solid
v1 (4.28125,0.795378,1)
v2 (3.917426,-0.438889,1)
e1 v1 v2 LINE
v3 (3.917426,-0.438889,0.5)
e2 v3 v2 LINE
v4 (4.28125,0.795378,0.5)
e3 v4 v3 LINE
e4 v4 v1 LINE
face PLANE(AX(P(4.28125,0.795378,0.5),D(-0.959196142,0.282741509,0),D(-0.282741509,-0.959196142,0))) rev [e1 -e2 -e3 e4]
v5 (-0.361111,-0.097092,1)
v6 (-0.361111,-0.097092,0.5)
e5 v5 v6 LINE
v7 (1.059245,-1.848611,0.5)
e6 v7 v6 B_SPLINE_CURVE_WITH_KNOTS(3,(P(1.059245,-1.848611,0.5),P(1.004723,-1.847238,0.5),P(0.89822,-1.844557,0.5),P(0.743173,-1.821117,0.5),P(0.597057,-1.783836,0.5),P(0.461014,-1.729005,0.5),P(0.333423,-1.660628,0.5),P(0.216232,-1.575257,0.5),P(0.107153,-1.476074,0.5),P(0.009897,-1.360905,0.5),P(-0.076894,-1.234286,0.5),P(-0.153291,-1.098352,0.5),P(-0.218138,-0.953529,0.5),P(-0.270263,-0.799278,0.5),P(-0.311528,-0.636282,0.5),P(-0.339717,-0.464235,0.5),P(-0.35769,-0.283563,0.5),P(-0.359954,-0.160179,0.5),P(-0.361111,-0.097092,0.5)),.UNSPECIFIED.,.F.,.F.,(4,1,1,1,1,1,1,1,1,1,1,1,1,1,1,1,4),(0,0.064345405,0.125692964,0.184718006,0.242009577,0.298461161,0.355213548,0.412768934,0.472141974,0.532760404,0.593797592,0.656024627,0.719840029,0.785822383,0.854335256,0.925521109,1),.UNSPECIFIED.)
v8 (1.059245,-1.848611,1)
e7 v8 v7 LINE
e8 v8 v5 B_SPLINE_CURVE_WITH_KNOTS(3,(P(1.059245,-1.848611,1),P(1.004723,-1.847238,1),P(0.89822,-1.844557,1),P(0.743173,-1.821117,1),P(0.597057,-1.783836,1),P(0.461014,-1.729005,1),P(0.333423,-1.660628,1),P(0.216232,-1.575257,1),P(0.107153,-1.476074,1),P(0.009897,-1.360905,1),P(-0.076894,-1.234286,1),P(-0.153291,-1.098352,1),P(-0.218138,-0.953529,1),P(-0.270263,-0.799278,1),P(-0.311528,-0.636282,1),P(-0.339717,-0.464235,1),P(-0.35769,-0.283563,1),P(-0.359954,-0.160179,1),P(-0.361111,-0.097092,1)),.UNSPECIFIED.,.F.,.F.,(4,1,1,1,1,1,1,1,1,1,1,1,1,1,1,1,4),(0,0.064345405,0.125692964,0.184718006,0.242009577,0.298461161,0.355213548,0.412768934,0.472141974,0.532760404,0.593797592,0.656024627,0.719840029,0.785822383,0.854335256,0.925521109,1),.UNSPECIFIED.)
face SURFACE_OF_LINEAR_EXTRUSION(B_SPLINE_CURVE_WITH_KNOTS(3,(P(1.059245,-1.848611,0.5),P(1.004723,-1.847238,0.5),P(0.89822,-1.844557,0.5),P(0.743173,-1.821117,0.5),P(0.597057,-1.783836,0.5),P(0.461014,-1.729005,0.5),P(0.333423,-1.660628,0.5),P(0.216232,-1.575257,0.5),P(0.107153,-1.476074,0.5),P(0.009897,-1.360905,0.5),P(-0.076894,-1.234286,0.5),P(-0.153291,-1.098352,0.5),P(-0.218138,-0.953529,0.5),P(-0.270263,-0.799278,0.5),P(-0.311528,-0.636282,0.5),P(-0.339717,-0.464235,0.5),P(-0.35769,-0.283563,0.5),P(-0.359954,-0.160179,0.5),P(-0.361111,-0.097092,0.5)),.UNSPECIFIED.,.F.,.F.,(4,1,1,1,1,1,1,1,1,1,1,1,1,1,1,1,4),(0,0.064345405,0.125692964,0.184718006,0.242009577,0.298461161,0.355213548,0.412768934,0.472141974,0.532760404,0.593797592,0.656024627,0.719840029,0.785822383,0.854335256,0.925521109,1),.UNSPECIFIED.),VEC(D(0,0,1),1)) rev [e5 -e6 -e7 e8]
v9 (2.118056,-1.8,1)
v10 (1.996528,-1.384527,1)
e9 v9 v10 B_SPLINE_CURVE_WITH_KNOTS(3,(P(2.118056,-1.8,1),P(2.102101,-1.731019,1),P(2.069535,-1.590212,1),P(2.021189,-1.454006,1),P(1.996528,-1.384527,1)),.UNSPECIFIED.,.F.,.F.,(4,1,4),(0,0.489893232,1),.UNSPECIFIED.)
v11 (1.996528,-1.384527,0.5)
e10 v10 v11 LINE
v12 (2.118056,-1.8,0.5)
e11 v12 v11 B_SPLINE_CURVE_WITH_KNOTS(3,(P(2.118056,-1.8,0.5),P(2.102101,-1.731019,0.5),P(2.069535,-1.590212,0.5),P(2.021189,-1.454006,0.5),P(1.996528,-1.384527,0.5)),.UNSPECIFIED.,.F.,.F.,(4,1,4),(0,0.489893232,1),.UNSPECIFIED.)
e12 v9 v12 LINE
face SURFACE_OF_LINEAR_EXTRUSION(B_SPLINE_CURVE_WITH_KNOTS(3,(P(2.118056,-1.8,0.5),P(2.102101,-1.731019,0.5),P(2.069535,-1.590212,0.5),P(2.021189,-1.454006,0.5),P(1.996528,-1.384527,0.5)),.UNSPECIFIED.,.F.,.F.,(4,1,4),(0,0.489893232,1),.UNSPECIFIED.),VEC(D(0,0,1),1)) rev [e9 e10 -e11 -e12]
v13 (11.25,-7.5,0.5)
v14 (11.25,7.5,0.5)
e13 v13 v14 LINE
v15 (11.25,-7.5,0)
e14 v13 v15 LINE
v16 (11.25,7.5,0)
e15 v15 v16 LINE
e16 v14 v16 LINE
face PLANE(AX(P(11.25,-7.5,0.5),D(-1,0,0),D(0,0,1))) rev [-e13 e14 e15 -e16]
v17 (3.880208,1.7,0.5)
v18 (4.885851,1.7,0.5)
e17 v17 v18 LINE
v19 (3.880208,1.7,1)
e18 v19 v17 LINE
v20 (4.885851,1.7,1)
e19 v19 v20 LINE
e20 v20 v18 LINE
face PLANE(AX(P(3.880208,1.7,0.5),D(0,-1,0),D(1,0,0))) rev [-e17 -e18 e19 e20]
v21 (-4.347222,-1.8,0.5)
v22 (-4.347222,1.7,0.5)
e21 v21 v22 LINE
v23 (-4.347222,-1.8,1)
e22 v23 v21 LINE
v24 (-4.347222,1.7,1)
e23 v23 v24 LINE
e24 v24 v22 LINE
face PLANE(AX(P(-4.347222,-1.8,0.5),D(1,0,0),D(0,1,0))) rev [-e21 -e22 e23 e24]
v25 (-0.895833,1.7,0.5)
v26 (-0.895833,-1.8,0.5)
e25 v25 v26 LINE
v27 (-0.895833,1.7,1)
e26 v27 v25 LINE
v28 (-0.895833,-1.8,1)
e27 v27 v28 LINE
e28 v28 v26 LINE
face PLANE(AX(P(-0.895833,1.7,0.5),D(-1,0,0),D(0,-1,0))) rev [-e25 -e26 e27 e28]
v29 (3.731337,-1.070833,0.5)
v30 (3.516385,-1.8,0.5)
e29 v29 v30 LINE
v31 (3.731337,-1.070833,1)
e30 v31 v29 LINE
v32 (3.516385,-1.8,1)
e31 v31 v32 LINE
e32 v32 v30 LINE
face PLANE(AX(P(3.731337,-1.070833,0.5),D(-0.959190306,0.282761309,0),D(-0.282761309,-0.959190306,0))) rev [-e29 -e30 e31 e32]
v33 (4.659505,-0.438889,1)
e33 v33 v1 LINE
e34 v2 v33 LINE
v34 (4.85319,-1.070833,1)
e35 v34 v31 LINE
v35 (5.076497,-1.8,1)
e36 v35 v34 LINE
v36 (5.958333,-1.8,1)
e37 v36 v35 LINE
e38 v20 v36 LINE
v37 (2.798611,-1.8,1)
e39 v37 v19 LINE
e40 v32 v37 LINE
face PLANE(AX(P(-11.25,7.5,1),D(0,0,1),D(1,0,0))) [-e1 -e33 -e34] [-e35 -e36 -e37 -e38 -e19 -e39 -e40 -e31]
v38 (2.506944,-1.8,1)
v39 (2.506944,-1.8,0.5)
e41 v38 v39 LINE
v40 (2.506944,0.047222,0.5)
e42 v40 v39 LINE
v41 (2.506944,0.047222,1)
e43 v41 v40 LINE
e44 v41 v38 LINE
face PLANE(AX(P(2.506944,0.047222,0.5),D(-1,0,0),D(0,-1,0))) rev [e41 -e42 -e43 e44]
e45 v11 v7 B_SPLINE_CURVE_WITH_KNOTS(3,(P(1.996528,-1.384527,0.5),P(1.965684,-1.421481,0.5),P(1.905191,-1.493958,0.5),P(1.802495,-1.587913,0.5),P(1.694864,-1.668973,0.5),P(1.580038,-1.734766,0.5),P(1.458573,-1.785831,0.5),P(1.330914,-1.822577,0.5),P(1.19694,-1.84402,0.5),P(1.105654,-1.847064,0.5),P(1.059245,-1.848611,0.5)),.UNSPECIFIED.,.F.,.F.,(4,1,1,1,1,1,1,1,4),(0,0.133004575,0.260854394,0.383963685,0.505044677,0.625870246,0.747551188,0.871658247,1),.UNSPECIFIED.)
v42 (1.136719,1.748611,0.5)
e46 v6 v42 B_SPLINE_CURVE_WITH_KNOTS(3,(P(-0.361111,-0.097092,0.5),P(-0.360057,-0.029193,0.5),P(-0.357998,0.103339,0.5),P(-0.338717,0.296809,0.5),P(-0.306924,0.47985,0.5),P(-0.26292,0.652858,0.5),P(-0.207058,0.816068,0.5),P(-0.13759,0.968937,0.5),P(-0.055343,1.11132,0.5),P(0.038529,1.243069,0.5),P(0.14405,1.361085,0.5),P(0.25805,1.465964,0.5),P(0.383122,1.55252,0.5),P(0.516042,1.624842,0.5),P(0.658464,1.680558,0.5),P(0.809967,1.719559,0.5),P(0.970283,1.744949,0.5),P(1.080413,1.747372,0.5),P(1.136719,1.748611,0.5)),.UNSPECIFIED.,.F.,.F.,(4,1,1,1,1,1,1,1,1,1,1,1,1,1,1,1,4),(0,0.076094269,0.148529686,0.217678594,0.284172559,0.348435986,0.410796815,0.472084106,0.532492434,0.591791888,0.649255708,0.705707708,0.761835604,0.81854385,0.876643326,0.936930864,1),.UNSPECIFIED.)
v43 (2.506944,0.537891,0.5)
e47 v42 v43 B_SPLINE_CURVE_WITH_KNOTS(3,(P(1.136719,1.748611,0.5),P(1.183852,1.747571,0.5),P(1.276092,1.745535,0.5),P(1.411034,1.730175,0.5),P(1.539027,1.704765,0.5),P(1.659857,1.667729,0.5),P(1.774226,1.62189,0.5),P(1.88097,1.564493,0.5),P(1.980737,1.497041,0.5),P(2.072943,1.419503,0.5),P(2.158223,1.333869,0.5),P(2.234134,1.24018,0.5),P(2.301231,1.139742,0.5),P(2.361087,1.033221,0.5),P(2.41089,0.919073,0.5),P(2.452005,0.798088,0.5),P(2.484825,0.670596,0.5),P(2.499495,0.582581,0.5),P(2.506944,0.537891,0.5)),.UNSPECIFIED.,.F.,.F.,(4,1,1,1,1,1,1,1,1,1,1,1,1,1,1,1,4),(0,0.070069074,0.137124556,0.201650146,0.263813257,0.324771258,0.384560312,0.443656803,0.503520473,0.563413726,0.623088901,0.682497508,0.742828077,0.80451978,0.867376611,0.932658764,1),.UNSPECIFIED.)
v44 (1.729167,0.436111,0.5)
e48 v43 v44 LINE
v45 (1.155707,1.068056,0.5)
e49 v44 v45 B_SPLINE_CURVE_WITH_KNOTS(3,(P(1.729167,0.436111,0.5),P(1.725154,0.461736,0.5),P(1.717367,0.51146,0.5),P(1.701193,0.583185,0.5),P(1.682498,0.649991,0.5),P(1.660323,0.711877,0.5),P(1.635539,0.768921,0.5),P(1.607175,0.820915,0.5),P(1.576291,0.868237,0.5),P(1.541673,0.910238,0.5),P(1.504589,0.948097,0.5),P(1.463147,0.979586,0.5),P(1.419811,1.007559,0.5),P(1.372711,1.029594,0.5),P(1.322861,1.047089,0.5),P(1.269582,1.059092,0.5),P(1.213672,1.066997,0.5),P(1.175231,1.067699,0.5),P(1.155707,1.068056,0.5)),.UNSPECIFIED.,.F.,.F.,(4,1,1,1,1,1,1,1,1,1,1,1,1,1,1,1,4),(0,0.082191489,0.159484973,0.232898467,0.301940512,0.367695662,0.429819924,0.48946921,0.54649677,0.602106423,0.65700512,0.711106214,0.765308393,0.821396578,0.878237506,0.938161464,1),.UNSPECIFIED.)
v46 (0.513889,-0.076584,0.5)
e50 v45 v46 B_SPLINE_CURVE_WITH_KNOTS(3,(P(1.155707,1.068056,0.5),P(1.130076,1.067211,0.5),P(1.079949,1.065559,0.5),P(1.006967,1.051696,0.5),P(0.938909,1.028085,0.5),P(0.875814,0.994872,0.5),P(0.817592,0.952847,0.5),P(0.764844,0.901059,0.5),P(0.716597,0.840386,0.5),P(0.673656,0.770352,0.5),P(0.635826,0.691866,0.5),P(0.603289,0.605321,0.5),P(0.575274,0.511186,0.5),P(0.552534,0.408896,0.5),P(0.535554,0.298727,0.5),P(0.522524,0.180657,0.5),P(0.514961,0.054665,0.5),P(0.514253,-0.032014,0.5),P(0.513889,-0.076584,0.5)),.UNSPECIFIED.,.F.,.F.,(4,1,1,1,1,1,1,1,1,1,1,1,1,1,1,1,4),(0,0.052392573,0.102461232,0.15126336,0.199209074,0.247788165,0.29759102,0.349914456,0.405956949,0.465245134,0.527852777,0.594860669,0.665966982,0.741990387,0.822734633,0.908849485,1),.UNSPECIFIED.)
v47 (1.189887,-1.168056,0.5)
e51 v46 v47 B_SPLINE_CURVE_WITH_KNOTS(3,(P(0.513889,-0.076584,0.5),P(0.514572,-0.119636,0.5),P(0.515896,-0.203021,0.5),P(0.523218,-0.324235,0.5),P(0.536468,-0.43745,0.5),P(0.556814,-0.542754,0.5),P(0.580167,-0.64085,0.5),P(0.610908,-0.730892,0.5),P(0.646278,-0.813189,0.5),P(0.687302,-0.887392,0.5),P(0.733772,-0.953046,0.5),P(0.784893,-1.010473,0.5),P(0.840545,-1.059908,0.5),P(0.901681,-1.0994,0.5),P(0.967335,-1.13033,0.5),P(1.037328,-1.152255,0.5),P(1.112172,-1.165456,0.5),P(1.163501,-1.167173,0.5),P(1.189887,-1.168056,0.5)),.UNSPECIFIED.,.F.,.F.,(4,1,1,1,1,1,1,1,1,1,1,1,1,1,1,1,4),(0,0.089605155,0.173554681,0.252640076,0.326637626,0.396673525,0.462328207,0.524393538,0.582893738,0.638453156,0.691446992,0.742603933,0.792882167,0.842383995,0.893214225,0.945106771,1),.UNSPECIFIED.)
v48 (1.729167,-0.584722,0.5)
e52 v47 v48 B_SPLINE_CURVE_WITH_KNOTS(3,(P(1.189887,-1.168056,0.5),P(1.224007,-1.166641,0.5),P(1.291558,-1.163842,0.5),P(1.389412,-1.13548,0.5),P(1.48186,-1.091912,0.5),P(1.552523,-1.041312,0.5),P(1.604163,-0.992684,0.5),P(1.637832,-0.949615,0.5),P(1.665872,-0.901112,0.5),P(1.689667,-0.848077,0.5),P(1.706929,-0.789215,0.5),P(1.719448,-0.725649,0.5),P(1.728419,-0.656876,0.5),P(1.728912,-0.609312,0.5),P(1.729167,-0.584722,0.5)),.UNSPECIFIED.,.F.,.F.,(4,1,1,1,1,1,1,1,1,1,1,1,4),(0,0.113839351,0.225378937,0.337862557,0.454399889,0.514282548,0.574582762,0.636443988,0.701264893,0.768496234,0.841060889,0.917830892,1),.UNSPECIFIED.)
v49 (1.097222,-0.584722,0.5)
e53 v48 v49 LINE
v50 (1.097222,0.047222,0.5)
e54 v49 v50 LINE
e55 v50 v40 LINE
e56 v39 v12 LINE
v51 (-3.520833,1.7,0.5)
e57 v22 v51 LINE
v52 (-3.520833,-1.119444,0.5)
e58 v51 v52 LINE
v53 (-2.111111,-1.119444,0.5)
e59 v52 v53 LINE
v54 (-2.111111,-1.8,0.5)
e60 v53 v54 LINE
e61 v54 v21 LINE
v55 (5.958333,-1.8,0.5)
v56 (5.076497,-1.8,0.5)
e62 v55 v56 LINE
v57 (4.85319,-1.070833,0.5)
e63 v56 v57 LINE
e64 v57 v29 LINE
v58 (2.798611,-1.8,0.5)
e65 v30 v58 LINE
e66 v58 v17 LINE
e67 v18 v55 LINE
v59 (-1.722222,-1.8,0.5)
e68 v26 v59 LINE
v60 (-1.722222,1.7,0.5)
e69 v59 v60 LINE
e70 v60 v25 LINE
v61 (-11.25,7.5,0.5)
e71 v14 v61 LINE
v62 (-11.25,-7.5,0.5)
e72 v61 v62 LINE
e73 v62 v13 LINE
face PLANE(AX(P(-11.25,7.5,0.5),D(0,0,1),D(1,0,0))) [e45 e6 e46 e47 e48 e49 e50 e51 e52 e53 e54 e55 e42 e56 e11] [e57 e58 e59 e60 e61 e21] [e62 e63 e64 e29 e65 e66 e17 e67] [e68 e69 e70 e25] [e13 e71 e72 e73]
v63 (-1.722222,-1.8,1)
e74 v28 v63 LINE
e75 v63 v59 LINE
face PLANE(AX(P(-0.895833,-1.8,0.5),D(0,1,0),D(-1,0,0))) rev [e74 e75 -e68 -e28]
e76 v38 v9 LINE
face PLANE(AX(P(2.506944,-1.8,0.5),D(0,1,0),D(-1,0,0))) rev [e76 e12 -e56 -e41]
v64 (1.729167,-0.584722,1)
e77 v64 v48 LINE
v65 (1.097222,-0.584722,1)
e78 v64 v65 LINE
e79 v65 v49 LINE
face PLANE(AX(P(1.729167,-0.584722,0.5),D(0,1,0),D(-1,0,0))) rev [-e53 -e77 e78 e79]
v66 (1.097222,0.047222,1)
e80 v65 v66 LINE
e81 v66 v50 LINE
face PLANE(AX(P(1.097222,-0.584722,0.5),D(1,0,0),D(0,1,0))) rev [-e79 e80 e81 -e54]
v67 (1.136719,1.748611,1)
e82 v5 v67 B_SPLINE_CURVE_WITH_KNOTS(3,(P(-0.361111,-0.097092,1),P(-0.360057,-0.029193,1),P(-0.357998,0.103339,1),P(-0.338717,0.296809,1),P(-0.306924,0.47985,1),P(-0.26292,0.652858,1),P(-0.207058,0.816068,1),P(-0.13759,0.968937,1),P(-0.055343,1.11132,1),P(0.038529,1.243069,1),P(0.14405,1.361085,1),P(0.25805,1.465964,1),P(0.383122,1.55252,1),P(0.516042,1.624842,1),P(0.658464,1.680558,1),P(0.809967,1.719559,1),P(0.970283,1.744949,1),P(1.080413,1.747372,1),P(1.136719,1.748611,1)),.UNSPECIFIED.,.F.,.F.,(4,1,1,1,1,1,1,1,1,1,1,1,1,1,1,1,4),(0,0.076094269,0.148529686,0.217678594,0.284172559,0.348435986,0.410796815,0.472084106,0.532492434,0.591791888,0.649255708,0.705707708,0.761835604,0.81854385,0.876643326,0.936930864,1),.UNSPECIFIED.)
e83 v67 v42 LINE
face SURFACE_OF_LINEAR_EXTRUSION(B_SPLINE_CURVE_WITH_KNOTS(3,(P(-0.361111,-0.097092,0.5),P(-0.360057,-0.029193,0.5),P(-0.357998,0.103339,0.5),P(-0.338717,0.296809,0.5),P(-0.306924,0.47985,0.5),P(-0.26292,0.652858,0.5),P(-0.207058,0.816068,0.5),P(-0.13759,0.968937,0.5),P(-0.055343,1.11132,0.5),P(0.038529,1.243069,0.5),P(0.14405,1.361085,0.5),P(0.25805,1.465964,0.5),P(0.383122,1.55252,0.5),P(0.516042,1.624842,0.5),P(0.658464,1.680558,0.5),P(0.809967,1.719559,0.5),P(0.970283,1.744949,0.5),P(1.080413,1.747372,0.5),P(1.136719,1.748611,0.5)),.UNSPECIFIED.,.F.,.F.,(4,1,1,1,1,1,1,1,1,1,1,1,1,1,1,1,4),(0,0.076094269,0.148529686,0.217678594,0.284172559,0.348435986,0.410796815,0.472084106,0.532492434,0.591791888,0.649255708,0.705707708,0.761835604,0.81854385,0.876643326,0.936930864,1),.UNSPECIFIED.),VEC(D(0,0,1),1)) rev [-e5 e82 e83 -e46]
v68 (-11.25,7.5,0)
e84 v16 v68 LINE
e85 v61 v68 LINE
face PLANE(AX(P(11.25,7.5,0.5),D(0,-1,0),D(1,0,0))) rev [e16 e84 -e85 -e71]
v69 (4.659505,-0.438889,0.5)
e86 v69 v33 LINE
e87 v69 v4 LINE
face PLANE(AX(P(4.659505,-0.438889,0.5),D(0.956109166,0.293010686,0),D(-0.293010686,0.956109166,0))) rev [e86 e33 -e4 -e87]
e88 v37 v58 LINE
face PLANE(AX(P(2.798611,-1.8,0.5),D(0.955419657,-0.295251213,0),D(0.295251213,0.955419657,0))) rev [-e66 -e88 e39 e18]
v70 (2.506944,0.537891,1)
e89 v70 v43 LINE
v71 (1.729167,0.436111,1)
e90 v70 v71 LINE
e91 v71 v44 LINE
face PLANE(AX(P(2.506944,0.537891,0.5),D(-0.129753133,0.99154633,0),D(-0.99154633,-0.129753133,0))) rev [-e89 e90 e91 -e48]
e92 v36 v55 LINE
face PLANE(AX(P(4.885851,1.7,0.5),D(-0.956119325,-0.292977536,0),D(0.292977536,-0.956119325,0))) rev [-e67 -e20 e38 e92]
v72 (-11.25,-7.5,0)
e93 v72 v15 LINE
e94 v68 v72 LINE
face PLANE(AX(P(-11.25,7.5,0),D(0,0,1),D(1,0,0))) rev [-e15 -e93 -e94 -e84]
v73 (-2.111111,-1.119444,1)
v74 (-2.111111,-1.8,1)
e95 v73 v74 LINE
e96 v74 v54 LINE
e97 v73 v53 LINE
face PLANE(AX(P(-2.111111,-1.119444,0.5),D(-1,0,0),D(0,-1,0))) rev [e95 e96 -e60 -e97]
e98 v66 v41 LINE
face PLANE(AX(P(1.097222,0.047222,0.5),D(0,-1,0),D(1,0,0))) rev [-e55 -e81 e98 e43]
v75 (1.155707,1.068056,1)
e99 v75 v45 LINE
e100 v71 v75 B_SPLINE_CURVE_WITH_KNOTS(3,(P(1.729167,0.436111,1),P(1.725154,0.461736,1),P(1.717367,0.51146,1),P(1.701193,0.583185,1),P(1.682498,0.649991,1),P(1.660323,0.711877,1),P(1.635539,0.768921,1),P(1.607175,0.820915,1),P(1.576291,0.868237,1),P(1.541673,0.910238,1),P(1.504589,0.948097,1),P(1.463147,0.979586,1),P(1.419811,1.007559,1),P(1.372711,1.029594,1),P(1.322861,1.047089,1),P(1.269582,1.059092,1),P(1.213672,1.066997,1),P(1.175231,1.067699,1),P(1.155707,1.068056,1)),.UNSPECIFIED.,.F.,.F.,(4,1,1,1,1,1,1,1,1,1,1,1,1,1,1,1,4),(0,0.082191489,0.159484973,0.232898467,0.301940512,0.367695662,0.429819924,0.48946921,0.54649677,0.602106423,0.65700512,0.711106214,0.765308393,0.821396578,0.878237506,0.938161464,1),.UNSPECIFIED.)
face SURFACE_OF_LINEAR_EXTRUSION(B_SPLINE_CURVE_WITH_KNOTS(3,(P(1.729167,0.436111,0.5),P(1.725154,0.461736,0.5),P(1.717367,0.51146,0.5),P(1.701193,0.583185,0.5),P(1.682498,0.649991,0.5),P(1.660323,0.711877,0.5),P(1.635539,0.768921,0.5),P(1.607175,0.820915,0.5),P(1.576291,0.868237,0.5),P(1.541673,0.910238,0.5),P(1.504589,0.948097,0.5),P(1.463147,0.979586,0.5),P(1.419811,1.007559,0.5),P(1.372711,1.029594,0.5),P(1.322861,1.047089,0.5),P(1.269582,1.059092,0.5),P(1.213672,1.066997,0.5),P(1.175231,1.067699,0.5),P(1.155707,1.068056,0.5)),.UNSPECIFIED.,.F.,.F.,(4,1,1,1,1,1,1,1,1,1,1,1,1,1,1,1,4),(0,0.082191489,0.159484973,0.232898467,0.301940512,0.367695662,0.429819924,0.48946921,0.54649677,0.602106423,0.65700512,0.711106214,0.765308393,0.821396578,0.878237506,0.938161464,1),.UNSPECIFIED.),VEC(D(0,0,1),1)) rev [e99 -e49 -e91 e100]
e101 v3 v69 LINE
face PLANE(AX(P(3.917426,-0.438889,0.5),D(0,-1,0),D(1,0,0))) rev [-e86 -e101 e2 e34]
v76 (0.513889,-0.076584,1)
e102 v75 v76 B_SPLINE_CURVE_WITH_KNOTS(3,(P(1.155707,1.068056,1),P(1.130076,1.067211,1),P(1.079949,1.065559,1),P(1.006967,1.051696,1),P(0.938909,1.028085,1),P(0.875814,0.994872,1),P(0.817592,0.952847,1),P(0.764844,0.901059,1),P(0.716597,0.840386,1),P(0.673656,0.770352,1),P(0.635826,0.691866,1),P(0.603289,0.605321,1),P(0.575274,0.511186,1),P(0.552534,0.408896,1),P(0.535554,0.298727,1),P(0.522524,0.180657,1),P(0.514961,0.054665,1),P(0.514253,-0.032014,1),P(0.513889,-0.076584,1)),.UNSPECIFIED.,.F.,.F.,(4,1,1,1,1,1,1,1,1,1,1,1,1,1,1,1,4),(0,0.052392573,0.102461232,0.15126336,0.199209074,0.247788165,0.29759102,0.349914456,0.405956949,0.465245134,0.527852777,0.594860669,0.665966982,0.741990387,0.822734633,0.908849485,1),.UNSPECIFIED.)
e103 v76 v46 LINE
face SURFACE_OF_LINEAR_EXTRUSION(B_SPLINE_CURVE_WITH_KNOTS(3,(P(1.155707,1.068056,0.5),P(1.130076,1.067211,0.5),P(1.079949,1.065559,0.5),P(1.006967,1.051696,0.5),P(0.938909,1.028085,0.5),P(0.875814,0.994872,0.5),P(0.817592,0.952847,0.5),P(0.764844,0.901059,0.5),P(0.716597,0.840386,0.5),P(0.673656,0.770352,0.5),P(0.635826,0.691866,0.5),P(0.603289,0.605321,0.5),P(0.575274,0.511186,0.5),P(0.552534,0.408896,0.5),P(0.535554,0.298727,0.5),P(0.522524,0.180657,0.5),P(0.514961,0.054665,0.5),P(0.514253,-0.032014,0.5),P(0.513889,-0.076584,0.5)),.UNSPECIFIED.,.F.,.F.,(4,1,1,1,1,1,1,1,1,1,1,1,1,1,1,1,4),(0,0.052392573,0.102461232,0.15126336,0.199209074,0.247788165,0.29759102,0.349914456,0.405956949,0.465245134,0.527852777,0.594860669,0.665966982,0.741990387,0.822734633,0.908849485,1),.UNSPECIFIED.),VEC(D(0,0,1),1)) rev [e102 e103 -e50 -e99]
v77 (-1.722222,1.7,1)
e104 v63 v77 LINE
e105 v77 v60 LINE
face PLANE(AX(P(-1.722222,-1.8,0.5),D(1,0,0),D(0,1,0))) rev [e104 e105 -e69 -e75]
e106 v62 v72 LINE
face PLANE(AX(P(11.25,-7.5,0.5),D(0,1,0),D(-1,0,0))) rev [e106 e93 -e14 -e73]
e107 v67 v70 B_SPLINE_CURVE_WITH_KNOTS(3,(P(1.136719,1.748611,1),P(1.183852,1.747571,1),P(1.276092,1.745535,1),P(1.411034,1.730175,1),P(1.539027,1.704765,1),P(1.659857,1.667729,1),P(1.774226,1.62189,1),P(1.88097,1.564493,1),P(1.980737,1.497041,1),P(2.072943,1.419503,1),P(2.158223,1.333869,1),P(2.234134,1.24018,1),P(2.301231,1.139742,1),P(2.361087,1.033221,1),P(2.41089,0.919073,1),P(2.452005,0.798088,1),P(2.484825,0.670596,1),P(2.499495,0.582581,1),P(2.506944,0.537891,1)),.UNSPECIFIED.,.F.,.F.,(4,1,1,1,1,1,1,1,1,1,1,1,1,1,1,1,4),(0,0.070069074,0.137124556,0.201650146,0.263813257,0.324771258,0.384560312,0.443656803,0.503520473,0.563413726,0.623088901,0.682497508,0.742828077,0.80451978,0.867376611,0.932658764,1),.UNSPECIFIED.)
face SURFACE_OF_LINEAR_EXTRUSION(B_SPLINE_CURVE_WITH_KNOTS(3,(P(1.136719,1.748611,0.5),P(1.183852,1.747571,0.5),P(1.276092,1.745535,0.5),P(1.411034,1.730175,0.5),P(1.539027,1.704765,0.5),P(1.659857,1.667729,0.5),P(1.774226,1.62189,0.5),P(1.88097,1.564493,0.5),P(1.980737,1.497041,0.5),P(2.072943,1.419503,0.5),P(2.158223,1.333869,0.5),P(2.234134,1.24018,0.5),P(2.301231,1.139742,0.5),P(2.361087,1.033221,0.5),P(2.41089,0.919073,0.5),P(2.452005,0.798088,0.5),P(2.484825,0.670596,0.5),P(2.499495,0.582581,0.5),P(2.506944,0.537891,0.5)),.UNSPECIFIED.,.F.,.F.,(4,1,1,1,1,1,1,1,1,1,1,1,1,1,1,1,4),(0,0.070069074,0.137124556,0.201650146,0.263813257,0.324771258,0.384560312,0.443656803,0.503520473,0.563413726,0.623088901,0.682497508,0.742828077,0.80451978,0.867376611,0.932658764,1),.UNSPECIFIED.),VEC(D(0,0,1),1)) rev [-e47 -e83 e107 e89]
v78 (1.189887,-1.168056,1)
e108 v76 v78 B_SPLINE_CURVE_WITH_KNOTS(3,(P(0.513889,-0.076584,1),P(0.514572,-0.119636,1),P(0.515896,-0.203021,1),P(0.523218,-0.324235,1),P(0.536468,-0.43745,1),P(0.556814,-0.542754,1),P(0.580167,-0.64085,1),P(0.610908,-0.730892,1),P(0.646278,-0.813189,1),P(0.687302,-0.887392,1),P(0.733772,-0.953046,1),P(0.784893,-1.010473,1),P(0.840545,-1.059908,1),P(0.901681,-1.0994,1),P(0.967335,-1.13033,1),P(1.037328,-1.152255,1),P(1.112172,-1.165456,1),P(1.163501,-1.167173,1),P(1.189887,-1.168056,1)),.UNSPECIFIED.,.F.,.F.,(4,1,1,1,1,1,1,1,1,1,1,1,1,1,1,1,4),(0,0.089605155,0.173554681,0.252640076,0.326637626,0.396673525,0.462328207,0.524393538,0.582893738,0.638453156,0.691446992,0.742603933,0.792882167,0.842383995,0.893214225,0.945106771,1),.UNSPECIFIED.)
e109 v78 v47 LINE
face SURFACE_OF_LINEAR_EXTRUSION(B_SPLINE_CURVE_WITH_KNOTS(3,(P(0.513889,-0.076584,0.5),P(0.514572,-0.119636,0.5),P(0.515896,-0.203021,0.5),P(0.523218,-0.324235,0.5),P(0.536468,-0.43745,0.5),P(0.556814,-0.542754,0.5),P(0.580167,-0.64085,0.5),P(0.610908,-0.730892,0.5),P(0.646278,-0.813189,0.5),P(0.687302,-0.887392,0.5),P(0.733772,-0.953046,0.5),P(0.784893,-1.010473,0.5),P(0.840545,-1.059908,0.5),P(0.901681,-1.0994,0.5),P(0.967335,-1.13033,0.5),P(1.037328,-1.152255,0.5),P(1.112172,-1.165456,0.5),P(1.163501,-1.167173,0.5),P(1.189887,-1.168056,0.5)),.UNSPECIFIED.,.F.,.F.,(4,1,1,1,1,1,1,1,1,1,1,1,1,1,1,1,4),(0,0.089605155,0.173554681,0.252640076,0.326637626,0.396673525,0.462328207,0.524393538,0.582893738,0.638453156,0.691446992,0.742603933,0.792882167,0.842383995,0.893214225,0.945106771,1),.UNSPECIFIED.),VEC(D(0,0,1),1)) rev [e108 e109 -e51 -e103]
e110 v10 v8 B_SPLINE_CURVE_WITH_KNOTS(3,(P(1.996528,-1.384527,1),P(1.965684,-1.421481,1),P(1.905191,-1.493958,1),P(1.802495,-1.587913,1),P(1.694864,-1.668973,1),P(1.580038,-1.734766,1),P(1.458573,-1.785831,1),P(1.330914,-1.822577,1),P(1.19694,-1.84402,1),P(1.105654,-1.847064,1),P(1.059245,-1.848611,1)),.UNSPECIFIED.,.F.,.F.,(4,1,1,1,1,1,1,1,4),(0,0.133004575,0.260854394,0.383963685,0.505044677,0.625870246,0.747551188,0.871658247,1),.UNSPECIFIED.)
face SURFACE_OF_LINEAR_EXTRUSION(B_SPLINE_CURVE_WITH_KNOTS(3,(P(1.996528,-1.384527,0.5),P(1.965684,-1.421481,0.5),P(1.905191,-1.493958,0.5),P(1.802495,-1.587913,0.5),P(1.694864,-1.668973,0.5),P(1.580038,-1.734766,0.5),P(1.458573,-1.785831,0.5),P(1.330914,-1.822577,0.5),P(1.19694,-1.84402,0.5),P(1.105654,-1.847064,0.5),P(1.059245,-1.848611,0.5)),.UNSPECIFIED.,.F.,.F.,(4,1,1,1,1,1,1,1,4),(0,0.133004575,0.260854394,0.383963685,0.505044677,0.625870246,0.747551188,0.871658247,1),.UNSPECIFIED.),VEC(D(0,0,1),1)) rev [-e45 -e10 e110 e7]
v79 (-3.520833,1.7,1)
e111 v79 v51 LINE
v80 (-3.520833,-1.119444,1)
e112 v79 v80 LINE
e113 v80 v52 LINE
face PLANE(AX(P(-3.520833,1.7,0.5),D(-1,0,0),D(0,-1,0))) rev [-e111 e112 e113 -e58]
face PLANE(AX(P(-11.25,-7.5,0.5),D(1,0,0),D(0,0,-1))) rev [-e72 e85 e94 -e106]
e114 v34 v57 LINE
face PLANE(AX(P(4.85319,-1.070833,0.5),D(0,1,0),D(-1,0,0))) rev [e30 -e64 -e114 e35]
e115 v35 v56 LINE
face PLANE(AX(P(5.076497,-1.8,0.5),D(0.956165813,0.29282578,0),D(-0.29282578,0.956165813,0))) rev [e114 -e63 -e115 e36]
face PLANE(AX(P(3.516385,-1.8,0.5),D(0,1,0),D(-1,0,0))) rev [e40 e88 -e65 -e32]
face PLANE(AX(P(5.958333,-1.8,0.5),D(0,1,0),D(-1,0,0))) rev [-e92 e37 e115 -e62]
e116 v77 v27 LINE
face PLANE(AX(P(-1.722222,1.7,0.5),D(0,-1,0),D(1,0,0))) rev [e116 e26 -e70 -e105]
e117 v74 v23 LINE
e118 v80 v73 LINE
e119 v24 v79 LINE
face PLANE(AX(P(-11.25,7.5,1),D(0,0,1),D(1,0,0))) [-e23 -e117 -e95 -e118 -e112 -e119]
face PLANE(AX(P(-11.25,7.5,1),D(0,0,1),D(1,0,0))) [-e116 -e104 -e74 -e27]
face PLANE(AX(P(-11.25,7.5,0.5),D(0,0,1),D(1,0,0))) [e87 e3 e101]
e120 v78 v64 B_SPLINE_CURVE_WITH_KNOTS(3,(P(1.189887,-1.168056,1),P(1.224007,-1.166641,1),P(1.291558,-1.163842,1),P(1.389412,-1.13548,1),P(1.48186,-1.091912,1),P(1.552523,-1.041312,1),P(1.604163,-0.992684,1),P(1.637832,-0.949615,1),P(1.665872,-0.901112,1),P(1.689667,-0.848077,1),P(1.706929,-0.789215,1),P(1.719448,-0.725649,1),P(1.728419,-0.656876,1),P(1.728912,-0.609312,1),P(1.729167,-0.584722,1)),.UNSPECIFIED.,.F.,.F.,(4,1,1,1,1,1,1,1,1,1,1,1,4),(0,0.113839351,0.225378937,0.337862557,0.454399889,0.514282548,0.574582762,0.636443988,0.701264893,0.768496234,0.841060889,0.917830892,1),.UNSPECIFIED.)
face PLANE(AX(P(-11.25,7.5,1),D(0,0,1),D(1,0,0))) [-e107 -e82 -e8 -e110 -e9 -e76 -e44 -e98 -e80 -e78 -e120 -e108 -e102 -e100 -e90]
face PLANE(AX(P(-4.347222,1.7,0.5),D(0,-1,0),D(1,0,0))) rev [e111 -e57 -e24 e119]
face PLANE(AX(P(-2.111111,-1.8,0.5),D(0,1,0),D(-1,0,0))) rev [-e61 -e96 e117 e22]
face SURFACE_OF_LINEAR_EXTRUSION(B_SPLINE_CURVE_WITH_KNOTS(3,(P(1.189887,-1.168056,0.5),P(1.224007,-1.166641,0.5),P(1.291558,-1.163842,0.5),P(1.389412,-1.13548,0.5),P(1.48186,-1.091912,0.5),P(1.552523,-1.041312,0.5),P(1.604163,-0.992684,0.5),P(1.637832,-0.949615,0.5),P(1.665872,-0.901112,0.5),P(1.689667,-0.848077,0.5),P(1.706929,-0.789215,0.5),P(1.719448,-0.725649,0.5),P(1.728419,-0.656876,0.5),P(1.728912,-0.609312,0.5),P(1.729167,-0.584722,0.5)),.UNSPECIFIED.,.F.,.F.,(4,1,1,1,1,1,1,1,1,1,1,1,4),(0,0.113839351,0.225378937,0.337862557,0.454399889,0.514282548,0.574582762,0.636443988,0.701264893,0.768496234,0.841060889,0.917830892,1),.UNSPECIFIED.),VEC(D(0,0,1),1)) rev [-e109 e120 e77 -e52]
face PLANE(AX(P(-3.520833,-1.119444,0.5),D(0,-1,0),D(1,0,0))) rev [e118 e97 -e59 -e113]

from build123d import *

# Parameters (mm, degrees)
SKETCH1_W           = 22.5
SKETCH1_H           = 15
BOSS_EXTRUDE1_DEPTH = 0.5
WRAP1_OUTLINE_W     = 0.826388889
WRAP1_OUTLINE_H     = 3.5
WRAP1_DEPTH         = 0.5


# Read off the part's stored shape, not the designer's step: Wrap1
with BuildPart() as part:
    # Sketch1 → Boss-Extrude1 (new body)
    with BuildSketch(Plane.XY):
        Rectangle(SKETCH1_W, SKETCH1_H)
    extrude(amount=BOSS_EXTRUDE1_DEPTH)

    # Wrap1 outline → Wrap1 (add)
    # profile 1 of 4: a face of its own
    with BuildSketch(Plane.XY.offset(0.5)):
        with BuildLine():
            add(Edge.make_bspline(
                [(2.118055556, -1.8), (2.102101425, -1.731019264), (2.069534878, -1.59021157), (2.021189223, -1.454006194), (1.996527778, -1.38452691)],
                knots=[0, 0, 0, 0, 0.489893232, 1, 1, 1, 1], degree=3))
            Line((2.118055556, -1.8), (2.506944444, -1.8))
            Line((2.506944444, -1.8), (2.506944444, 0.047222222))
            Line((2.506944444, 0.047222222), (1.097222222, 0.047222222))
            Line((1.097222222, 0.047222222), (1.097222222, -0.584722222))
            Line((1.097222222, -0.584722222), (1.729166667, -0.584722222))
            add(Edge.make_bspline(
                [(1.189887153, -1.168055556), (1.224007135, -1.166641415), (1.291557812, -1.163841703), (1.389411618, -1.135479706), (1.48186011, -1.091912059), (1.552522736, -1.041311507), (1.604163451, -0.992684417), (1.637831654, -0.949615289), (1.665872255, -0.901112075), (1.689666798, -0.848077449), (1.70692943, -0.789214567), (1.719447815, -0.72564884), (1.728419327, -0.65687553), (1.728911975, -0.609311898), (1.729166667, -0.584722222)],
                knots=[0, 0, 0, 0, 0.113839351, 0.225378937, 0.337862557, 0.454399889, 0.514282548, 0.574582762, 0.636443988, 0.701264893, 0.768496234, 0.841060889, 0.917830892, 1, 1, 1, 1], degree=3))
            add(Edge.make_bspline(
                [(0.513888889, -0.076584201), (0.514572313, -0.119635576), (0.515896024, -0.203021042), (0.523217979, -0.32423507), (0.536468218, -0.437450039), (0.556814389, -0.542753882), (0.58016669, -0.640850258), (0.610908424, -0.730891969), (0.646278395, -0.813189447), (0.687302005, -0.887392166), (0.733771509, -0.953045942), (0.784892562, -1.010472833), (0.840544687, -1.059907744), (0.901681039, -1.099399842), (0.967335449, -1.130329733), (1.037327541, -1.152255059), (1.112172234, -1.165456245), (1.163501396, -1.167173038), (1.189887153, -1.168055556)],
                knots=[0, 0, 0, 0, 0.089605155, 0.173554681, 0.252640076, 0.326637626, 0.396673525, 0.462328207, 0.524393538, 0.582893738, 0.638453156, 0.691446992, 0.742603933, 0.792882167, 0.842383995, 0.893214225, 0.945106771, 1, 1, 1, 1], degree=3))
            add(Edge.make_bspline(
                [(1.155707465, 1.068055556), (1.130075838, 1.067210899), (1.079949494, 1.065559051), (1.00696703, 1.051696413), (0.938909467, 1.028085171), (0.875814409, 0.994871993), (0.817591808, 0.952846932), (0.76484425, 0.901059239), (0.716596885, 0.840386196), (0.673656251, 0.770352319), (0.635825562, 0.691866233), (0.603288773, 0.605321415), (0.575274497, 0.511186428), (0.552534046, 0.408895639), (0.535554331, 0.298727159), (0.522524141, 0.180656658), (0.514960566, 0.054664626), (0.514252816, -0.03201382), (0.513888889, -0.076584201)],
                knots=[0, 0, 0, 0, 0.052392573, 0.102461232, 0.15126336, 0.199209074, 0.247788165, 0.29759102, 0.349914456, 0.405956949, 0.465245134, 0.527852777, 0.594860669, 0.665966982, 0.741990387, 0.822734633, 0.908849485, 1, 1, 1, 1], degree=3))
            add(Edge.make_bspline(
                [(1.729166667, 0.436111111), (1.725153755, 0.461736316), (1.717367072, 0.511459652), (1.701192738, 0.583185082), (1.6824977, 0.649991098), (1.660322693, 0.711876638), (1.635538667, 0.768921126), (1.607174662, 0.820915366), (1.576291477, 0.868236988), (1.541672833, 0.910237935), (1.50458923, 0.948097333), (1.463146746, 0.97958563), (1.419810775, 1.00755935), (1.372711281, 1.02959383), (1.322861274, 1.047089034), (1.269581929, 1.059092439), (1.213672152, 1.066996713), (1.175230511, 1.067698927), (1.155707465, 1.068055556)],
                knots=[0, 0, 0, 0, 0.082191489, 0.159484973, 0.232898467, 0.301940512, 0.367695662, 0.429819924, 0.48946921, 0.54649677, 0.602106423, 0.65700512, 0.711106214, 0.765308393, 0.821396578, 0.878237506, 0.938161464, 1, 1, 1, 1], degree=3))
            Line((1.729166667, 0.436111111), (2.506944444, 0.537890625))
            add(Edge.make_bspline(
                [(1.13671875, 1.748611111), (1.183852349, 1.747570689), (1.276092384, 1.745534592), (1.411034443, 1.730174961), (1.539027431, 1.704764538), (1.659857093, 1.667729236), (1.774225525, 1.621890079), (1.880970414, 1.564492815), (1.980736808, 1.497041103), (2.072943296, 1.419502923), (2.158223008, 1.333869175), (2.234134407, 1.240180481), (2.301231448, 1.13974161), (2.361087022, 1.033221224), (2.410889646, 0.919073074), (2.452005017, 0.798088035), (2.484825247, 0.670596043), (2.499495457, 0.582581264), (2.506944444, 0.537890625)],
                knots=[0, 0, 0, 0, 0.070069074, 0.137124556, 0.201650146, 0.263813257, 0.324771258, 0.384560312, 0.443656803, 0.503520473, 0.563413726, 0.623088901, 0.682497508, 0.742828077, 0.80451978, 0.867376611, 0.932658764, 1, 1, 1, 1], degree=3))
            add(Edge.make_bspline(
                [(-0.361111111, -0.097092014), (-0.360056629, -0.029193424), (-0.357998366, 0.103338977), (-0.338716764, 0.296809121), (-0.30692414, 0.479850097), (-0.262920099, 0.652858131), (-0.207057789, 0.816068001), (-0.137589586, 0.968937488), (-0.055342885, 1.111319656), (0.038529131, 1.243069192), (0.144049567, 1.361084804), (0.258050156, 1.46596394), (0.383121972, 1.552519732), (0.516042062, 1.624841653), (0.658464001, 1.680557916), (0.809966935, 1.71955882), (0.970283346, 1.744948697), (1.080412506, 1.747372091), (1.13671875, 1.748611111)],
                knots=[0, 0, 0, 0, 0.076094269, 0.148529686, 0.217678594, 0.284172559, 0.348435986, 0.410796815, 0.472084106, 0.532492434, 0.591791888, 0.649255708, 0.705707708, 0.761835604, 0.81854385, 0.876643326, 0.936930864, 1, 1, 1, 1], degree=3))
            add(Edge.make_bspline(
                [(1.059244792, -1.848611111), (1.004723071, -1.847238309), (0.89821979, -1.844556663), (0.743173288, -1.821117291), (0.597057137, -1.783836147), (0.461013751, -1.729005295), (0.333422729, -1.660627785), (0.216232156, -1.575256979), (0.107153099, -1.476073515), (0.009896653, -1.360905337), (-0.076894112, -1.234286084), (-0.153291075, -1.098351542), (-0.218137905, -0.953529332), (-0.27026294, -0.799278052), (-0.311528227, -0.636281671), (-0.339716794, -0.464234977), (-0.35768967, -0.28356275), (-0.359953571, -0.160178706), (-0.361111111, -0.097092014)],
                knots=[0, 0, 0, 0, 0.064345405, 0.125692964, 0.184718006, 0.242009577, 0.298461161, 0.355213548, 0.412768934, 0.472141974, 0.532760404, 0.593797592, 0.656024627, 0.719840029, 0.785822383, 0.854335256, 0.925521109, 1, 1, 1, 1], degree=3))
            add(Edge.make_bspline(
                [(1.996527778, -1.38452691), (1.965683846, -1.421481302), (1.905191378, -1.493957872), (1.802494662, -1.587913316), (1.69486425, -1.668972518), (1.580037705, -1.734766305), (1.458573377, -1.785831157), (1.330913621, -1.822576666), (1.196939841, -1.844019509), (1.105653567, -1.847063556), (1.059244792, -1.848611111)],
                knots=[0, 0, 0, 0, 0.133004575, 0.260854394, 0.383963685, 0.505044677, 0.625870246, 0.747551188, 0.871658247, 1, 1, 1, 1], degree=3))
        make_face()
    # profile 2 of 4: a face of its own
    with BuildSketch(Plane.XY.offset(0.5)):
        Polygon((-2.111111111, -1.8), (-2.111111111, -1.119444444), (-3.520833333, -1.119444444), (-3.520833333, 1.7), (-4.347222222, 1.7), (-4.347222222, -1.8), align=None)
    # profile 3 of 4: a face of its own
    with BuildSketch(Plane.XY.offset(0.5)):
        with Locations((-1.309027778, -0.05)):
            Rectangle(WRAP1_OUTLINE_W, WRAP1_OUTLINE_H)
    # profile 4 of 4: a face of its own
    with BuildSketch(Plane.XY.offset(0.5)):
        Polygon((5.076497396, -1.8), (5.958333333, -1.8), (4.885850694, 1.7), (3.880208333, 1.7), (2.798611111, -1.8), (3.516384549, -1.8), (3.731336806, -1.070833333), (4.853190104, -1.070833333), align=None)
        Polygon((4.28125, 0.795377604), (4.659505208, -0.438888889), (3.917426215, -0.438888889), align=None, mode=Mode.SUBTRACT)
    extrude(amount=WRAP1_DEPTH)


solid = part.part
